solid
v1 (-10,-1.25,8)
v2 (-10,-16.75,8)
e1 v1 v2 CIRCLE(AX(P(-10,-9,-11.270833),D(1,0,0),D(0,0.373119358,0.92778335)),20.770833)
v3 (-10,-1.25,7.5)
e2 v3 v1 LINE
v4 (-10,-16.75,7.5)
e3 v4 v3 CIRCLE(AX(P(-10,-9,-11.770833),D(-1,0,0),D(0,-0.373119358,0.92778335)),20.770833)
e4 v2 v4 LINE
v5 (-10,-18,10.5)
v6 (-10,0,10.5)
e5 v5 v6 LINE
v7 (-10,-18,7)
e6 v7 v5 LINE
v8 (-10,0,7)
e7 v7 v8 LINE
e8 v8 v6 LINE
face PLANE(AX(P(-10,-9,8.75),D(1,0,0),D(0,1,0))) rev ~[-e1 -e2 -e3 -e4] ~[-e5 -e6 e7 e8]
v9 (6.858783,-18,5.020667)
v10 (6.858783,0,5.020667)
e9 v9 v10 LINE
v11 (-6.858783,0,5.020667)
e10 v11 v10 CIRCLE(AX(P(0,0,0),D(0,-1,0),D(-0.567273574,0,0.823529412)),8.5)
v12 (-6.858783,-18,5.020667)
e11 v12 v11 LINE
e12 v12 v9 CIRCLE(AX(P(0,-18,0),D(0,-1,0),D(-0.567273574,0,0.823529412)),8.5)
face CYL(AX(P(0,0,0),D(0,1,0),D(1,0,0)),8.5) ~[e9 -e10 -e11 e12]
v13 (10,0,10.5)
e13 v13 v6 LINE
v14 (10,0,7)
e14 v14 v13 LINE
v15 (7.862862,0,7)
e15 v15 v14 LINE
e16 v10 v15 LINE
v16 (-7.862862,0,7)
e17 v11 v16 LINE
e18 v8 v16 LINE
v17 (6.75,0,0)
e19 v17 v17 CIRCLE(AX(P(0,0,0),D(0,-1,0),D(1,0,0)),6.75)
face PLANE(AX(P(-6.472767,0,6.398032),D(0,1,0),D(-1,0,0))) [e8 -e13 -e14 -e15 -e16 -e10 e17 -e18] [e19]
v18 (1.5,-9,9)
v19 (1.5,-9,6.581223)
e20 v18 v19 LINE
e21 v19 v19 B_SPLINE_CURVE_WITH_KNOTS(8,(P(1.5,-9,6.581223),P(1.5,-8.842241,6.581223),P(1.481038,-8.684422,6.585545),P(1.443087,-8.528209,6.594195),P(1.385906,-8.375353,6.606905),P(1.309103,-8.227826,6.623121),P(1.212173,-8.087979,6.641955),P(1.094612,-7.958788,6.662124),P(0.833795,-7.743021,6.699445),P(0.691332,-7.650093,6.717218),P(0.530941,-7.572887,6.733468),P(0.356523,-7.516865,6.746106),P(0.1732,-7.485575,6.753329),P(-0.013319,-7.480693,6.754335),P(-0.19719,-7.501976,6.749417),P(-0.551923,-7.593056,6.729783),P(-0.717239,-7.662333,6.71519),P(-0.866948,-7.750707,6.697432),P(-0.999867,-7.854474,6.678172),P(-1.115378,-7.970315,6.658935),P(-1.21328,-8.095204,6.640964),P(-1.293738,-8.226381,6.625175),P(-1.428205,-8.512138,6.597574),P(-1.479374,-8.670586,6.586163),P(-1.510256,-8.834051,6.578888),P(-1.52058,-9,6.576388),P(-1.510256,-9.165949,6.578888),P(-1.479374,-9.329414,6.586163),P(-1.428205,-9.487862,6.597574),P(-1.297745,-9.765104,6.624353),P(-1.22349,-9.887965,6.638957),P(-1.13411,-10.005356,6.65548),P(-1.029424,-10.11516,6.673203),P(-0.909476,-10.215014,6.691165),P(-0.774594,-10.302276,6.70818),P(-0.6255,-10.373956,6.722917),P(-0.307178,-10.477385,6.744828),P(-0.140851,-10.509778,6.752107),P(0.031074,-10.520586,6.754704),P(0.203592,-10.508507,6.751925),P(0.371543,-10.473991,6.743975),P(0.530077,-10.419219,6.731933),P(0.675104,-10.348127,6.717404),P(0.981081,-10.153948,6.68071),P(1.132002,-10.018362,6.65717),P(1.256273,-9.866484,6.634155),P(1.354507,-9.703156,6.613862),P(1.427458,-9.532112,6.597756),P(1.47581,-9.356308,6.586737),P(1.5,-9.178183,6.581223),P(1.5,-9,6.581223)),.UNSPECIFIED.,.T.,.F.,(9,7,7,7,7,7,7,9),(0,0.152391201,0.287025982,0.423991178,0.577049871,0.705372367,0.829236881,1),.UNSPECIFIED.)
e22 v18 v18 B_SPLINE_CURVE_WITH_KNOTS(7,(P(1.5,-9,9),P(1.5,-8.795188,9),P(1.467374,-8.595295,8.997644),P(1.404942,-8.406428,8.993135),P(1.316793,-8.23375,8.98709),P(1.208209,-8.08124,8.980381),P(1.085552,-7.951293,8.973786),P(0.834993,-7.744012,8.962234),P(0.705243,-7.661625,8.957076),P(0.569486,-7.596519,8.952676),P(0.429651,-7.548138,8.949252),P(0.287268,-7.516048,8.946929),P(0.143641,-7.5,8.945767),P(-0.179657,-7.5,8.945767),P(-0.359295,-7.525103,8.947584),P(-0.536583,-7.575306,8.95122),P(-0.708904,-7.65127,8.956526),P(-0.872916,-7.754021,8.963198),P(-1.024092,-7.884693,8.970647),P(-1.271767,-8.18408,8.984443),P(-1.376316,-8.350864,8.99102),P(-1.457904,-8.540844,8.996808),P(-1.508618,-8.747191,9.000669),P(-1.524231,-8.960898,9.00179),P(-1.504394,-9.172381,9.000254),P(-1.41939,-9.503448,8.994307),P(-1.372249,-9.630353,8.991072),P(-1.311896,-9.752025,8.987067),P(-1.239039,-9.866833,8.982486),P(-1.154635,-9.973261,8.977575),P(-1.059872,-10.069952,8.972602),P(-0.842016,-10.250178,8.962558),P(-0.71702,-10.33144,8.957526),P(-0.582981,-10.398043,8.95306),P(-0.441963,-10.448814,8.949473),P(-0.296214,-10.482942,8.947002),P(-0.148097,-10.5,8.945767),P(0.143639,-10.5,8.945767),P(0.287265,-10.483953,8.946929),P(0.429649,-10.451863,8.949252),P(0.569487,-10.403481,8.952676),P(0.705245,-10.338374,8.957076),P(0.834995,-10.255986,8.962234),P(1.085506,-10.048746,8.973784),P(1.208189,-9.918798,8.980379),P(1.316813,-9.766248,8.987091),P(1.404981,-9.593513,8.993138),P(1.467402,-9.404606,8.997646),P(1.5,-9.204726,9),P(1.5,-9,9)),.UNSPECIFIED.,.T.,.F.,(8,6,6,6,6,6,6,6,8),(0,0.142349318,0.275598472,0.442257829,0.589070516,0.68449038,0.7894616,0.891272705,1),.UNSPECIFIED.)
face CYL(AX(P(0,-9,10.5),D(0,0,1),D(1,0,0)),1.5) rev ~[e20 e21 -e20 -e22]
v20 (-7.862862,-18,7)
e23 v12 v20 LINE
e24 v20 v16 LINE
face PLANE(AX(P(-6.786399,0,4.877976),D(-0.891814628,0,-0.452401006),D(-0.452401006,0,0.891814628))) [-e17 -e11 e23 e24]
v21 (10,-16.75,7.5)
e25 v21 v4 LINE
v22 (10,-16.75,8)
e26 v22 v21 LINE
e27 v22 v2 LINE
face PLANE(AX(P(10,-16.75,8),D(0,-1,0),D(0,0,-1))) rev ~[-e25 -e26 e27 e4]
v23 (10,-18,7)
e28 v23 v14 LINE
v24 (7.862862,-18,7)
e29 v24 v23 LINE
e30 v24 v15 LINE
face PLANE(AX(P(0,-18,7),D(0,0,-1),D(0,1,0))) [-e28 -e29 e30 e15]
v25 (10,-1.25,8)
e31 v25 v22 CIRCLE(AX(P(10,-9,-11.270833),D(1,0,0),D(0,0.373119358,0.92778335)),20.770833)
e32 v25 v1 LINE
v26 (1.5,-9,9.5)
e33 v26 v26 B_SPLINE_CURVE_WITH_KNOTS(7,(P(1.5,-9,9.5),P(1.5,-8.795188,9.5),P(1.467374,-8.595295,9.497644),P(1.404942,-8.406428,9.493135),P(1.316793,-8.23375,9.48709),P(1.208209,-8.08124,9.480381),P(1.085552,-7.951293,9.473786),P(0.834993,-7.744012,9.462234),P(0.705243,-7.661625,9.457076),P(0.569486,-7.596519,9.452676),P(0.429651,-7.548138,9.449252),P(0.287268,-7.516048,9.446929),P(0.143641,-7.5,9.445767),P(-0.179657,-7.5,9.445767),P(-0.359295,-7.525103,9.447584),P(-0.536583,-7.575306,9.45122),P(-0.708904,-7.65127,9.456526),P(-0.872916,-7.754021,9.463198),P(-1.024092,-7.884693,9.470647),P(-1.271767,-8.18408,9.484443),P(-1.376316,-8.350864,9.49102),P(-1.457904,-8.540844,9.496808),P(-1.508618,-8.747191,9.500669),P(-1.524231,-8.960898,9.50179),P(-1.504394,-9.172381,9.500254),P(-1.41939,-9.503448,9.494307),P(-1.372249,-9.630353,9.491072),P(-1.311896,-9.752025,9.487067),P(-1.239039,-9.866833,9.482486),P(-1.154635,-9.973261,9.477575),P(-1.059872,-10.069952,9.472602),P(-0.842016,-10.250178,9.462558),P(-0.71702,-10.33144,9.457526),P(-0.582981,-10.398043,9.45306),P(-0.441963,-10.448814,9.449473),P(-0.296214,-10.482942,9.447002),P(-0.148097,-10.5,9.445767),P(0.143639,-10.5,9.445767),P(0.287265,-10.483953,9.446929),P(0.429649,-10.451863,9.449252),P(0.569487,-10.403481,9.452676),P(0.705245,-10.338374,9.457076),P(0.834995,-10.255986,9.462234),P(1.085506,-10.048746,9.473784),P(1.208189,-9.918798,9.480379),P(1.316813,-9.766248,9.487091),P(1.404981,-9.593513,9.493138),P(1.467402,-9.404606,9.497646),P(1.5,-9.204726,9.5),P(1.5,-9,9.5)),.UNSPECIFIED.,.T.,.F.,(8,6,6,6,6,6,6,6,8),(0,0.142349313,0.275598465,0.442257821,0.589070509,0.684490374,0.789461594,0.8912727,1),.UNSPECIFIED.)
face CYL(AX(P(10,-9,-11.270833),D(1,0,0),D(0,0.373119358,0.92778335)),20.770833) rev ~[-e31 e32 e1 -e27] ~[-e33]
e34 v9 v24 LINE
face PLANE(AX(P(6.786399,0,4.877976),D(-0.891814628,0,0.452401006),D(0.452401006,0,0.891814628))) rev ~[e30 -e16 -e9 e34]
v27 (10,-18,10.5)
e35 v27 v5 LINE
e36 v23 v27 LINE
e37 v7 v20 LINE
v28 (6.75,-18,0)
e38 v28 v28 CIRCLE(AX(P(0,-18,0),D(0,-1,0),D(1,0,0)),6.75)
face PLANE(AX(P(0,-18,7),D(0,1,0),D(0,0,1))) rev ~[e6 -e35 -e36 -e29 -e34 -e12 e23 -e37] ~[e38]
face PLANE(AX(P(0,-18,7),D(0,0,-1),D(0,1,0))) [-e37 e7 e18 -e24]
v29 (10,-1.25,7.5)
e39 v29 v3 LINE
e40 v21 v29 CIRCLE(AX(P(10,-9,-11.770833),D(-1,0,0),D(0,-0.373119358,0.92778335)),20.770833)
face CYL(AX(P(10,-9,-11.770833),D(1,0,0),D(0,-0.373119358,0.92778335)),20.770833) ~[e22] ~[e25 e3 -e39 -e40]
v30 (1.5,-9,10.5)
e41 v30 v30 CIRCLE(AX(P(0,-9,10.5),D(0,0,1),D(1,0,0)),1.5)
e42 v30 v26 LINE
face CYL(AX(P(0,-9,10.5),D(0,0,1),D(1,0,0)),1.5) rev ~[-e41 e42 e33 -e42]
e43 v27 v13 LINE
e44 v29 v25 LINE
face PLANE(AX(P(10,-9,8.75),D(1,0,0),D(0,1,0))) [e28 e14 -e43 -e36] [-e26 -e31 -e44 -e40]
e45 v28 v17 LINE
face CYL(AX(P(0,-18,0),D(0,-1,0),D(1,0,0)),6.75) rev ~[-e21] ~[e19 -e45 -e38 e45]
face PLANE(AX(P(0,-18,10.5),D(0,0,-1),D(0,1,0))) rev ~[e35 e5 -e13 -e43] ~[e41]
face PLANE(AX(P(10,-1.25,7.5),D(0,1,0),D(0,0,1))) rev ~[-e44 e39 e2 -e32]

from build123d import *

# Parameters (mm, degrees)
F0_R         = 8.5
F1_DEPTH     = 18
F2_R         = 6.75
F3_DEPTH     = 18
F4_W         = 18
F4_H         = 3.5
F5_DEPTH     = 10
F7_DEPTH     = 20
F8_R         = 1.5
F9_DEPTH     = 5
F10_T1_DEPTH = 18


# Not quite as in the source:
# - a fillet or chamfer that OpenCascade refuses, or shapes differently, is made with other operations: its cross-section is extruded or revolved along the edge and cut away or added


with BuildPart() as f1:
    # F0 (on Front) → F1 (new body)
    with BuildSketch(Plane.XZ):
        Circle(F0_R)
    extrude(amount=F1_DEPTH)

    # F2 (on face) → F3 (cut, through all)
    with BuildSketch(Plane.XZ.offset(18)):
        Circle(F2_R)
    extrude(amount=-F3_DEPTH, mode=Mode.SUBTRACT)

    # F4 (on Right) → F5 (join, symmetric)
    with BuildSketch(Plane.YZ):
        with Locations((-9, 8.75)):
            Rectangle(F4_W, F4_H)
    extrude(amount=F5_DEPTH, both=True)

    # F6 (on face) → F7 (cut, through all)
    with BuildSketch(Plane.YZ.offset(10)):
        with BuildLine():
            Line((-16.75, 8), (-16.75, 7.5))
            ThreePointArc((-16.75, 7.5), (-9, 9), (-1.25, 7.5))
            Line((-1.25, 7.5), (-1.25, 8))
            ThreePointArc((-1.25, 8), (-9, 9.5), (-16.75, 8))
        make_face()
    extrude(amount=-F7_DEPTH, mode=Mode.SUBTRACT)

    # F8 (on face) → F9 (cut)
    with BuildSketch(Plane.XY.offset(10.5)):
        with Locations((0, -9)):
            Circle(F8_R)
    extrude(amount=-F9_DEPTH, mode=Mode.SUBTRACT)

    # F10: chamfer of 4 on 2 edges, made by hand

    # F10_s2 → F10_t1 (join)
    with BuildSketch(Plane.XZ):
        with BuildLine():
            Line((-6.7863990228, 4.8779762725), (-7.9352464288, 7.1426903404))
            Line((-7.9352464288, 7.1426903404), (-7.9352464288, 7.2226903404))
            ThreePointArc((-7.9352464288, 7.2226903404), (-6.3785359046, 7.08), (-4.8218253805, 7.08))
            Line((-4.8218253805, 7.08), (-4.7764434946, 6.9341176471))
            ThreePointArc((-4.7764434946, 6.9341176471), (-5.8850678371, 6.0218250184), (-6.7218457694, 4.8307229397))
            Line((-6.7218457694, 4.8307229397), (-6.7863990228, 4.8779762725))
        make_face()
        with BuildLine():
            Line((6.7863990228, 4.8779762725), (7.9352464288, 7.1426903404))
            Line((7.9352464288, 7.1426903404), (7.9352464288, 7.2226903404))
            ThreePointArc((7.9352464288, 7.2226903404), (6.3785359046, 7.08), (4.8218253805, 7.08))
            Line((4.8218253805, 7.08), (4.7764434946, 6.9341176471))
            ThreePointArc((4.7764434946, 6.9341176471), (5.8850678371, 6.0218250184), (6.7218457694, 4.8307229397))
            Line((6.7218457694, 4.8307229397), (6.7863990228, 4.8779762725))
        make_face()
    extrude(amount=F10_T1_DEPTH)


solid = f1.part
